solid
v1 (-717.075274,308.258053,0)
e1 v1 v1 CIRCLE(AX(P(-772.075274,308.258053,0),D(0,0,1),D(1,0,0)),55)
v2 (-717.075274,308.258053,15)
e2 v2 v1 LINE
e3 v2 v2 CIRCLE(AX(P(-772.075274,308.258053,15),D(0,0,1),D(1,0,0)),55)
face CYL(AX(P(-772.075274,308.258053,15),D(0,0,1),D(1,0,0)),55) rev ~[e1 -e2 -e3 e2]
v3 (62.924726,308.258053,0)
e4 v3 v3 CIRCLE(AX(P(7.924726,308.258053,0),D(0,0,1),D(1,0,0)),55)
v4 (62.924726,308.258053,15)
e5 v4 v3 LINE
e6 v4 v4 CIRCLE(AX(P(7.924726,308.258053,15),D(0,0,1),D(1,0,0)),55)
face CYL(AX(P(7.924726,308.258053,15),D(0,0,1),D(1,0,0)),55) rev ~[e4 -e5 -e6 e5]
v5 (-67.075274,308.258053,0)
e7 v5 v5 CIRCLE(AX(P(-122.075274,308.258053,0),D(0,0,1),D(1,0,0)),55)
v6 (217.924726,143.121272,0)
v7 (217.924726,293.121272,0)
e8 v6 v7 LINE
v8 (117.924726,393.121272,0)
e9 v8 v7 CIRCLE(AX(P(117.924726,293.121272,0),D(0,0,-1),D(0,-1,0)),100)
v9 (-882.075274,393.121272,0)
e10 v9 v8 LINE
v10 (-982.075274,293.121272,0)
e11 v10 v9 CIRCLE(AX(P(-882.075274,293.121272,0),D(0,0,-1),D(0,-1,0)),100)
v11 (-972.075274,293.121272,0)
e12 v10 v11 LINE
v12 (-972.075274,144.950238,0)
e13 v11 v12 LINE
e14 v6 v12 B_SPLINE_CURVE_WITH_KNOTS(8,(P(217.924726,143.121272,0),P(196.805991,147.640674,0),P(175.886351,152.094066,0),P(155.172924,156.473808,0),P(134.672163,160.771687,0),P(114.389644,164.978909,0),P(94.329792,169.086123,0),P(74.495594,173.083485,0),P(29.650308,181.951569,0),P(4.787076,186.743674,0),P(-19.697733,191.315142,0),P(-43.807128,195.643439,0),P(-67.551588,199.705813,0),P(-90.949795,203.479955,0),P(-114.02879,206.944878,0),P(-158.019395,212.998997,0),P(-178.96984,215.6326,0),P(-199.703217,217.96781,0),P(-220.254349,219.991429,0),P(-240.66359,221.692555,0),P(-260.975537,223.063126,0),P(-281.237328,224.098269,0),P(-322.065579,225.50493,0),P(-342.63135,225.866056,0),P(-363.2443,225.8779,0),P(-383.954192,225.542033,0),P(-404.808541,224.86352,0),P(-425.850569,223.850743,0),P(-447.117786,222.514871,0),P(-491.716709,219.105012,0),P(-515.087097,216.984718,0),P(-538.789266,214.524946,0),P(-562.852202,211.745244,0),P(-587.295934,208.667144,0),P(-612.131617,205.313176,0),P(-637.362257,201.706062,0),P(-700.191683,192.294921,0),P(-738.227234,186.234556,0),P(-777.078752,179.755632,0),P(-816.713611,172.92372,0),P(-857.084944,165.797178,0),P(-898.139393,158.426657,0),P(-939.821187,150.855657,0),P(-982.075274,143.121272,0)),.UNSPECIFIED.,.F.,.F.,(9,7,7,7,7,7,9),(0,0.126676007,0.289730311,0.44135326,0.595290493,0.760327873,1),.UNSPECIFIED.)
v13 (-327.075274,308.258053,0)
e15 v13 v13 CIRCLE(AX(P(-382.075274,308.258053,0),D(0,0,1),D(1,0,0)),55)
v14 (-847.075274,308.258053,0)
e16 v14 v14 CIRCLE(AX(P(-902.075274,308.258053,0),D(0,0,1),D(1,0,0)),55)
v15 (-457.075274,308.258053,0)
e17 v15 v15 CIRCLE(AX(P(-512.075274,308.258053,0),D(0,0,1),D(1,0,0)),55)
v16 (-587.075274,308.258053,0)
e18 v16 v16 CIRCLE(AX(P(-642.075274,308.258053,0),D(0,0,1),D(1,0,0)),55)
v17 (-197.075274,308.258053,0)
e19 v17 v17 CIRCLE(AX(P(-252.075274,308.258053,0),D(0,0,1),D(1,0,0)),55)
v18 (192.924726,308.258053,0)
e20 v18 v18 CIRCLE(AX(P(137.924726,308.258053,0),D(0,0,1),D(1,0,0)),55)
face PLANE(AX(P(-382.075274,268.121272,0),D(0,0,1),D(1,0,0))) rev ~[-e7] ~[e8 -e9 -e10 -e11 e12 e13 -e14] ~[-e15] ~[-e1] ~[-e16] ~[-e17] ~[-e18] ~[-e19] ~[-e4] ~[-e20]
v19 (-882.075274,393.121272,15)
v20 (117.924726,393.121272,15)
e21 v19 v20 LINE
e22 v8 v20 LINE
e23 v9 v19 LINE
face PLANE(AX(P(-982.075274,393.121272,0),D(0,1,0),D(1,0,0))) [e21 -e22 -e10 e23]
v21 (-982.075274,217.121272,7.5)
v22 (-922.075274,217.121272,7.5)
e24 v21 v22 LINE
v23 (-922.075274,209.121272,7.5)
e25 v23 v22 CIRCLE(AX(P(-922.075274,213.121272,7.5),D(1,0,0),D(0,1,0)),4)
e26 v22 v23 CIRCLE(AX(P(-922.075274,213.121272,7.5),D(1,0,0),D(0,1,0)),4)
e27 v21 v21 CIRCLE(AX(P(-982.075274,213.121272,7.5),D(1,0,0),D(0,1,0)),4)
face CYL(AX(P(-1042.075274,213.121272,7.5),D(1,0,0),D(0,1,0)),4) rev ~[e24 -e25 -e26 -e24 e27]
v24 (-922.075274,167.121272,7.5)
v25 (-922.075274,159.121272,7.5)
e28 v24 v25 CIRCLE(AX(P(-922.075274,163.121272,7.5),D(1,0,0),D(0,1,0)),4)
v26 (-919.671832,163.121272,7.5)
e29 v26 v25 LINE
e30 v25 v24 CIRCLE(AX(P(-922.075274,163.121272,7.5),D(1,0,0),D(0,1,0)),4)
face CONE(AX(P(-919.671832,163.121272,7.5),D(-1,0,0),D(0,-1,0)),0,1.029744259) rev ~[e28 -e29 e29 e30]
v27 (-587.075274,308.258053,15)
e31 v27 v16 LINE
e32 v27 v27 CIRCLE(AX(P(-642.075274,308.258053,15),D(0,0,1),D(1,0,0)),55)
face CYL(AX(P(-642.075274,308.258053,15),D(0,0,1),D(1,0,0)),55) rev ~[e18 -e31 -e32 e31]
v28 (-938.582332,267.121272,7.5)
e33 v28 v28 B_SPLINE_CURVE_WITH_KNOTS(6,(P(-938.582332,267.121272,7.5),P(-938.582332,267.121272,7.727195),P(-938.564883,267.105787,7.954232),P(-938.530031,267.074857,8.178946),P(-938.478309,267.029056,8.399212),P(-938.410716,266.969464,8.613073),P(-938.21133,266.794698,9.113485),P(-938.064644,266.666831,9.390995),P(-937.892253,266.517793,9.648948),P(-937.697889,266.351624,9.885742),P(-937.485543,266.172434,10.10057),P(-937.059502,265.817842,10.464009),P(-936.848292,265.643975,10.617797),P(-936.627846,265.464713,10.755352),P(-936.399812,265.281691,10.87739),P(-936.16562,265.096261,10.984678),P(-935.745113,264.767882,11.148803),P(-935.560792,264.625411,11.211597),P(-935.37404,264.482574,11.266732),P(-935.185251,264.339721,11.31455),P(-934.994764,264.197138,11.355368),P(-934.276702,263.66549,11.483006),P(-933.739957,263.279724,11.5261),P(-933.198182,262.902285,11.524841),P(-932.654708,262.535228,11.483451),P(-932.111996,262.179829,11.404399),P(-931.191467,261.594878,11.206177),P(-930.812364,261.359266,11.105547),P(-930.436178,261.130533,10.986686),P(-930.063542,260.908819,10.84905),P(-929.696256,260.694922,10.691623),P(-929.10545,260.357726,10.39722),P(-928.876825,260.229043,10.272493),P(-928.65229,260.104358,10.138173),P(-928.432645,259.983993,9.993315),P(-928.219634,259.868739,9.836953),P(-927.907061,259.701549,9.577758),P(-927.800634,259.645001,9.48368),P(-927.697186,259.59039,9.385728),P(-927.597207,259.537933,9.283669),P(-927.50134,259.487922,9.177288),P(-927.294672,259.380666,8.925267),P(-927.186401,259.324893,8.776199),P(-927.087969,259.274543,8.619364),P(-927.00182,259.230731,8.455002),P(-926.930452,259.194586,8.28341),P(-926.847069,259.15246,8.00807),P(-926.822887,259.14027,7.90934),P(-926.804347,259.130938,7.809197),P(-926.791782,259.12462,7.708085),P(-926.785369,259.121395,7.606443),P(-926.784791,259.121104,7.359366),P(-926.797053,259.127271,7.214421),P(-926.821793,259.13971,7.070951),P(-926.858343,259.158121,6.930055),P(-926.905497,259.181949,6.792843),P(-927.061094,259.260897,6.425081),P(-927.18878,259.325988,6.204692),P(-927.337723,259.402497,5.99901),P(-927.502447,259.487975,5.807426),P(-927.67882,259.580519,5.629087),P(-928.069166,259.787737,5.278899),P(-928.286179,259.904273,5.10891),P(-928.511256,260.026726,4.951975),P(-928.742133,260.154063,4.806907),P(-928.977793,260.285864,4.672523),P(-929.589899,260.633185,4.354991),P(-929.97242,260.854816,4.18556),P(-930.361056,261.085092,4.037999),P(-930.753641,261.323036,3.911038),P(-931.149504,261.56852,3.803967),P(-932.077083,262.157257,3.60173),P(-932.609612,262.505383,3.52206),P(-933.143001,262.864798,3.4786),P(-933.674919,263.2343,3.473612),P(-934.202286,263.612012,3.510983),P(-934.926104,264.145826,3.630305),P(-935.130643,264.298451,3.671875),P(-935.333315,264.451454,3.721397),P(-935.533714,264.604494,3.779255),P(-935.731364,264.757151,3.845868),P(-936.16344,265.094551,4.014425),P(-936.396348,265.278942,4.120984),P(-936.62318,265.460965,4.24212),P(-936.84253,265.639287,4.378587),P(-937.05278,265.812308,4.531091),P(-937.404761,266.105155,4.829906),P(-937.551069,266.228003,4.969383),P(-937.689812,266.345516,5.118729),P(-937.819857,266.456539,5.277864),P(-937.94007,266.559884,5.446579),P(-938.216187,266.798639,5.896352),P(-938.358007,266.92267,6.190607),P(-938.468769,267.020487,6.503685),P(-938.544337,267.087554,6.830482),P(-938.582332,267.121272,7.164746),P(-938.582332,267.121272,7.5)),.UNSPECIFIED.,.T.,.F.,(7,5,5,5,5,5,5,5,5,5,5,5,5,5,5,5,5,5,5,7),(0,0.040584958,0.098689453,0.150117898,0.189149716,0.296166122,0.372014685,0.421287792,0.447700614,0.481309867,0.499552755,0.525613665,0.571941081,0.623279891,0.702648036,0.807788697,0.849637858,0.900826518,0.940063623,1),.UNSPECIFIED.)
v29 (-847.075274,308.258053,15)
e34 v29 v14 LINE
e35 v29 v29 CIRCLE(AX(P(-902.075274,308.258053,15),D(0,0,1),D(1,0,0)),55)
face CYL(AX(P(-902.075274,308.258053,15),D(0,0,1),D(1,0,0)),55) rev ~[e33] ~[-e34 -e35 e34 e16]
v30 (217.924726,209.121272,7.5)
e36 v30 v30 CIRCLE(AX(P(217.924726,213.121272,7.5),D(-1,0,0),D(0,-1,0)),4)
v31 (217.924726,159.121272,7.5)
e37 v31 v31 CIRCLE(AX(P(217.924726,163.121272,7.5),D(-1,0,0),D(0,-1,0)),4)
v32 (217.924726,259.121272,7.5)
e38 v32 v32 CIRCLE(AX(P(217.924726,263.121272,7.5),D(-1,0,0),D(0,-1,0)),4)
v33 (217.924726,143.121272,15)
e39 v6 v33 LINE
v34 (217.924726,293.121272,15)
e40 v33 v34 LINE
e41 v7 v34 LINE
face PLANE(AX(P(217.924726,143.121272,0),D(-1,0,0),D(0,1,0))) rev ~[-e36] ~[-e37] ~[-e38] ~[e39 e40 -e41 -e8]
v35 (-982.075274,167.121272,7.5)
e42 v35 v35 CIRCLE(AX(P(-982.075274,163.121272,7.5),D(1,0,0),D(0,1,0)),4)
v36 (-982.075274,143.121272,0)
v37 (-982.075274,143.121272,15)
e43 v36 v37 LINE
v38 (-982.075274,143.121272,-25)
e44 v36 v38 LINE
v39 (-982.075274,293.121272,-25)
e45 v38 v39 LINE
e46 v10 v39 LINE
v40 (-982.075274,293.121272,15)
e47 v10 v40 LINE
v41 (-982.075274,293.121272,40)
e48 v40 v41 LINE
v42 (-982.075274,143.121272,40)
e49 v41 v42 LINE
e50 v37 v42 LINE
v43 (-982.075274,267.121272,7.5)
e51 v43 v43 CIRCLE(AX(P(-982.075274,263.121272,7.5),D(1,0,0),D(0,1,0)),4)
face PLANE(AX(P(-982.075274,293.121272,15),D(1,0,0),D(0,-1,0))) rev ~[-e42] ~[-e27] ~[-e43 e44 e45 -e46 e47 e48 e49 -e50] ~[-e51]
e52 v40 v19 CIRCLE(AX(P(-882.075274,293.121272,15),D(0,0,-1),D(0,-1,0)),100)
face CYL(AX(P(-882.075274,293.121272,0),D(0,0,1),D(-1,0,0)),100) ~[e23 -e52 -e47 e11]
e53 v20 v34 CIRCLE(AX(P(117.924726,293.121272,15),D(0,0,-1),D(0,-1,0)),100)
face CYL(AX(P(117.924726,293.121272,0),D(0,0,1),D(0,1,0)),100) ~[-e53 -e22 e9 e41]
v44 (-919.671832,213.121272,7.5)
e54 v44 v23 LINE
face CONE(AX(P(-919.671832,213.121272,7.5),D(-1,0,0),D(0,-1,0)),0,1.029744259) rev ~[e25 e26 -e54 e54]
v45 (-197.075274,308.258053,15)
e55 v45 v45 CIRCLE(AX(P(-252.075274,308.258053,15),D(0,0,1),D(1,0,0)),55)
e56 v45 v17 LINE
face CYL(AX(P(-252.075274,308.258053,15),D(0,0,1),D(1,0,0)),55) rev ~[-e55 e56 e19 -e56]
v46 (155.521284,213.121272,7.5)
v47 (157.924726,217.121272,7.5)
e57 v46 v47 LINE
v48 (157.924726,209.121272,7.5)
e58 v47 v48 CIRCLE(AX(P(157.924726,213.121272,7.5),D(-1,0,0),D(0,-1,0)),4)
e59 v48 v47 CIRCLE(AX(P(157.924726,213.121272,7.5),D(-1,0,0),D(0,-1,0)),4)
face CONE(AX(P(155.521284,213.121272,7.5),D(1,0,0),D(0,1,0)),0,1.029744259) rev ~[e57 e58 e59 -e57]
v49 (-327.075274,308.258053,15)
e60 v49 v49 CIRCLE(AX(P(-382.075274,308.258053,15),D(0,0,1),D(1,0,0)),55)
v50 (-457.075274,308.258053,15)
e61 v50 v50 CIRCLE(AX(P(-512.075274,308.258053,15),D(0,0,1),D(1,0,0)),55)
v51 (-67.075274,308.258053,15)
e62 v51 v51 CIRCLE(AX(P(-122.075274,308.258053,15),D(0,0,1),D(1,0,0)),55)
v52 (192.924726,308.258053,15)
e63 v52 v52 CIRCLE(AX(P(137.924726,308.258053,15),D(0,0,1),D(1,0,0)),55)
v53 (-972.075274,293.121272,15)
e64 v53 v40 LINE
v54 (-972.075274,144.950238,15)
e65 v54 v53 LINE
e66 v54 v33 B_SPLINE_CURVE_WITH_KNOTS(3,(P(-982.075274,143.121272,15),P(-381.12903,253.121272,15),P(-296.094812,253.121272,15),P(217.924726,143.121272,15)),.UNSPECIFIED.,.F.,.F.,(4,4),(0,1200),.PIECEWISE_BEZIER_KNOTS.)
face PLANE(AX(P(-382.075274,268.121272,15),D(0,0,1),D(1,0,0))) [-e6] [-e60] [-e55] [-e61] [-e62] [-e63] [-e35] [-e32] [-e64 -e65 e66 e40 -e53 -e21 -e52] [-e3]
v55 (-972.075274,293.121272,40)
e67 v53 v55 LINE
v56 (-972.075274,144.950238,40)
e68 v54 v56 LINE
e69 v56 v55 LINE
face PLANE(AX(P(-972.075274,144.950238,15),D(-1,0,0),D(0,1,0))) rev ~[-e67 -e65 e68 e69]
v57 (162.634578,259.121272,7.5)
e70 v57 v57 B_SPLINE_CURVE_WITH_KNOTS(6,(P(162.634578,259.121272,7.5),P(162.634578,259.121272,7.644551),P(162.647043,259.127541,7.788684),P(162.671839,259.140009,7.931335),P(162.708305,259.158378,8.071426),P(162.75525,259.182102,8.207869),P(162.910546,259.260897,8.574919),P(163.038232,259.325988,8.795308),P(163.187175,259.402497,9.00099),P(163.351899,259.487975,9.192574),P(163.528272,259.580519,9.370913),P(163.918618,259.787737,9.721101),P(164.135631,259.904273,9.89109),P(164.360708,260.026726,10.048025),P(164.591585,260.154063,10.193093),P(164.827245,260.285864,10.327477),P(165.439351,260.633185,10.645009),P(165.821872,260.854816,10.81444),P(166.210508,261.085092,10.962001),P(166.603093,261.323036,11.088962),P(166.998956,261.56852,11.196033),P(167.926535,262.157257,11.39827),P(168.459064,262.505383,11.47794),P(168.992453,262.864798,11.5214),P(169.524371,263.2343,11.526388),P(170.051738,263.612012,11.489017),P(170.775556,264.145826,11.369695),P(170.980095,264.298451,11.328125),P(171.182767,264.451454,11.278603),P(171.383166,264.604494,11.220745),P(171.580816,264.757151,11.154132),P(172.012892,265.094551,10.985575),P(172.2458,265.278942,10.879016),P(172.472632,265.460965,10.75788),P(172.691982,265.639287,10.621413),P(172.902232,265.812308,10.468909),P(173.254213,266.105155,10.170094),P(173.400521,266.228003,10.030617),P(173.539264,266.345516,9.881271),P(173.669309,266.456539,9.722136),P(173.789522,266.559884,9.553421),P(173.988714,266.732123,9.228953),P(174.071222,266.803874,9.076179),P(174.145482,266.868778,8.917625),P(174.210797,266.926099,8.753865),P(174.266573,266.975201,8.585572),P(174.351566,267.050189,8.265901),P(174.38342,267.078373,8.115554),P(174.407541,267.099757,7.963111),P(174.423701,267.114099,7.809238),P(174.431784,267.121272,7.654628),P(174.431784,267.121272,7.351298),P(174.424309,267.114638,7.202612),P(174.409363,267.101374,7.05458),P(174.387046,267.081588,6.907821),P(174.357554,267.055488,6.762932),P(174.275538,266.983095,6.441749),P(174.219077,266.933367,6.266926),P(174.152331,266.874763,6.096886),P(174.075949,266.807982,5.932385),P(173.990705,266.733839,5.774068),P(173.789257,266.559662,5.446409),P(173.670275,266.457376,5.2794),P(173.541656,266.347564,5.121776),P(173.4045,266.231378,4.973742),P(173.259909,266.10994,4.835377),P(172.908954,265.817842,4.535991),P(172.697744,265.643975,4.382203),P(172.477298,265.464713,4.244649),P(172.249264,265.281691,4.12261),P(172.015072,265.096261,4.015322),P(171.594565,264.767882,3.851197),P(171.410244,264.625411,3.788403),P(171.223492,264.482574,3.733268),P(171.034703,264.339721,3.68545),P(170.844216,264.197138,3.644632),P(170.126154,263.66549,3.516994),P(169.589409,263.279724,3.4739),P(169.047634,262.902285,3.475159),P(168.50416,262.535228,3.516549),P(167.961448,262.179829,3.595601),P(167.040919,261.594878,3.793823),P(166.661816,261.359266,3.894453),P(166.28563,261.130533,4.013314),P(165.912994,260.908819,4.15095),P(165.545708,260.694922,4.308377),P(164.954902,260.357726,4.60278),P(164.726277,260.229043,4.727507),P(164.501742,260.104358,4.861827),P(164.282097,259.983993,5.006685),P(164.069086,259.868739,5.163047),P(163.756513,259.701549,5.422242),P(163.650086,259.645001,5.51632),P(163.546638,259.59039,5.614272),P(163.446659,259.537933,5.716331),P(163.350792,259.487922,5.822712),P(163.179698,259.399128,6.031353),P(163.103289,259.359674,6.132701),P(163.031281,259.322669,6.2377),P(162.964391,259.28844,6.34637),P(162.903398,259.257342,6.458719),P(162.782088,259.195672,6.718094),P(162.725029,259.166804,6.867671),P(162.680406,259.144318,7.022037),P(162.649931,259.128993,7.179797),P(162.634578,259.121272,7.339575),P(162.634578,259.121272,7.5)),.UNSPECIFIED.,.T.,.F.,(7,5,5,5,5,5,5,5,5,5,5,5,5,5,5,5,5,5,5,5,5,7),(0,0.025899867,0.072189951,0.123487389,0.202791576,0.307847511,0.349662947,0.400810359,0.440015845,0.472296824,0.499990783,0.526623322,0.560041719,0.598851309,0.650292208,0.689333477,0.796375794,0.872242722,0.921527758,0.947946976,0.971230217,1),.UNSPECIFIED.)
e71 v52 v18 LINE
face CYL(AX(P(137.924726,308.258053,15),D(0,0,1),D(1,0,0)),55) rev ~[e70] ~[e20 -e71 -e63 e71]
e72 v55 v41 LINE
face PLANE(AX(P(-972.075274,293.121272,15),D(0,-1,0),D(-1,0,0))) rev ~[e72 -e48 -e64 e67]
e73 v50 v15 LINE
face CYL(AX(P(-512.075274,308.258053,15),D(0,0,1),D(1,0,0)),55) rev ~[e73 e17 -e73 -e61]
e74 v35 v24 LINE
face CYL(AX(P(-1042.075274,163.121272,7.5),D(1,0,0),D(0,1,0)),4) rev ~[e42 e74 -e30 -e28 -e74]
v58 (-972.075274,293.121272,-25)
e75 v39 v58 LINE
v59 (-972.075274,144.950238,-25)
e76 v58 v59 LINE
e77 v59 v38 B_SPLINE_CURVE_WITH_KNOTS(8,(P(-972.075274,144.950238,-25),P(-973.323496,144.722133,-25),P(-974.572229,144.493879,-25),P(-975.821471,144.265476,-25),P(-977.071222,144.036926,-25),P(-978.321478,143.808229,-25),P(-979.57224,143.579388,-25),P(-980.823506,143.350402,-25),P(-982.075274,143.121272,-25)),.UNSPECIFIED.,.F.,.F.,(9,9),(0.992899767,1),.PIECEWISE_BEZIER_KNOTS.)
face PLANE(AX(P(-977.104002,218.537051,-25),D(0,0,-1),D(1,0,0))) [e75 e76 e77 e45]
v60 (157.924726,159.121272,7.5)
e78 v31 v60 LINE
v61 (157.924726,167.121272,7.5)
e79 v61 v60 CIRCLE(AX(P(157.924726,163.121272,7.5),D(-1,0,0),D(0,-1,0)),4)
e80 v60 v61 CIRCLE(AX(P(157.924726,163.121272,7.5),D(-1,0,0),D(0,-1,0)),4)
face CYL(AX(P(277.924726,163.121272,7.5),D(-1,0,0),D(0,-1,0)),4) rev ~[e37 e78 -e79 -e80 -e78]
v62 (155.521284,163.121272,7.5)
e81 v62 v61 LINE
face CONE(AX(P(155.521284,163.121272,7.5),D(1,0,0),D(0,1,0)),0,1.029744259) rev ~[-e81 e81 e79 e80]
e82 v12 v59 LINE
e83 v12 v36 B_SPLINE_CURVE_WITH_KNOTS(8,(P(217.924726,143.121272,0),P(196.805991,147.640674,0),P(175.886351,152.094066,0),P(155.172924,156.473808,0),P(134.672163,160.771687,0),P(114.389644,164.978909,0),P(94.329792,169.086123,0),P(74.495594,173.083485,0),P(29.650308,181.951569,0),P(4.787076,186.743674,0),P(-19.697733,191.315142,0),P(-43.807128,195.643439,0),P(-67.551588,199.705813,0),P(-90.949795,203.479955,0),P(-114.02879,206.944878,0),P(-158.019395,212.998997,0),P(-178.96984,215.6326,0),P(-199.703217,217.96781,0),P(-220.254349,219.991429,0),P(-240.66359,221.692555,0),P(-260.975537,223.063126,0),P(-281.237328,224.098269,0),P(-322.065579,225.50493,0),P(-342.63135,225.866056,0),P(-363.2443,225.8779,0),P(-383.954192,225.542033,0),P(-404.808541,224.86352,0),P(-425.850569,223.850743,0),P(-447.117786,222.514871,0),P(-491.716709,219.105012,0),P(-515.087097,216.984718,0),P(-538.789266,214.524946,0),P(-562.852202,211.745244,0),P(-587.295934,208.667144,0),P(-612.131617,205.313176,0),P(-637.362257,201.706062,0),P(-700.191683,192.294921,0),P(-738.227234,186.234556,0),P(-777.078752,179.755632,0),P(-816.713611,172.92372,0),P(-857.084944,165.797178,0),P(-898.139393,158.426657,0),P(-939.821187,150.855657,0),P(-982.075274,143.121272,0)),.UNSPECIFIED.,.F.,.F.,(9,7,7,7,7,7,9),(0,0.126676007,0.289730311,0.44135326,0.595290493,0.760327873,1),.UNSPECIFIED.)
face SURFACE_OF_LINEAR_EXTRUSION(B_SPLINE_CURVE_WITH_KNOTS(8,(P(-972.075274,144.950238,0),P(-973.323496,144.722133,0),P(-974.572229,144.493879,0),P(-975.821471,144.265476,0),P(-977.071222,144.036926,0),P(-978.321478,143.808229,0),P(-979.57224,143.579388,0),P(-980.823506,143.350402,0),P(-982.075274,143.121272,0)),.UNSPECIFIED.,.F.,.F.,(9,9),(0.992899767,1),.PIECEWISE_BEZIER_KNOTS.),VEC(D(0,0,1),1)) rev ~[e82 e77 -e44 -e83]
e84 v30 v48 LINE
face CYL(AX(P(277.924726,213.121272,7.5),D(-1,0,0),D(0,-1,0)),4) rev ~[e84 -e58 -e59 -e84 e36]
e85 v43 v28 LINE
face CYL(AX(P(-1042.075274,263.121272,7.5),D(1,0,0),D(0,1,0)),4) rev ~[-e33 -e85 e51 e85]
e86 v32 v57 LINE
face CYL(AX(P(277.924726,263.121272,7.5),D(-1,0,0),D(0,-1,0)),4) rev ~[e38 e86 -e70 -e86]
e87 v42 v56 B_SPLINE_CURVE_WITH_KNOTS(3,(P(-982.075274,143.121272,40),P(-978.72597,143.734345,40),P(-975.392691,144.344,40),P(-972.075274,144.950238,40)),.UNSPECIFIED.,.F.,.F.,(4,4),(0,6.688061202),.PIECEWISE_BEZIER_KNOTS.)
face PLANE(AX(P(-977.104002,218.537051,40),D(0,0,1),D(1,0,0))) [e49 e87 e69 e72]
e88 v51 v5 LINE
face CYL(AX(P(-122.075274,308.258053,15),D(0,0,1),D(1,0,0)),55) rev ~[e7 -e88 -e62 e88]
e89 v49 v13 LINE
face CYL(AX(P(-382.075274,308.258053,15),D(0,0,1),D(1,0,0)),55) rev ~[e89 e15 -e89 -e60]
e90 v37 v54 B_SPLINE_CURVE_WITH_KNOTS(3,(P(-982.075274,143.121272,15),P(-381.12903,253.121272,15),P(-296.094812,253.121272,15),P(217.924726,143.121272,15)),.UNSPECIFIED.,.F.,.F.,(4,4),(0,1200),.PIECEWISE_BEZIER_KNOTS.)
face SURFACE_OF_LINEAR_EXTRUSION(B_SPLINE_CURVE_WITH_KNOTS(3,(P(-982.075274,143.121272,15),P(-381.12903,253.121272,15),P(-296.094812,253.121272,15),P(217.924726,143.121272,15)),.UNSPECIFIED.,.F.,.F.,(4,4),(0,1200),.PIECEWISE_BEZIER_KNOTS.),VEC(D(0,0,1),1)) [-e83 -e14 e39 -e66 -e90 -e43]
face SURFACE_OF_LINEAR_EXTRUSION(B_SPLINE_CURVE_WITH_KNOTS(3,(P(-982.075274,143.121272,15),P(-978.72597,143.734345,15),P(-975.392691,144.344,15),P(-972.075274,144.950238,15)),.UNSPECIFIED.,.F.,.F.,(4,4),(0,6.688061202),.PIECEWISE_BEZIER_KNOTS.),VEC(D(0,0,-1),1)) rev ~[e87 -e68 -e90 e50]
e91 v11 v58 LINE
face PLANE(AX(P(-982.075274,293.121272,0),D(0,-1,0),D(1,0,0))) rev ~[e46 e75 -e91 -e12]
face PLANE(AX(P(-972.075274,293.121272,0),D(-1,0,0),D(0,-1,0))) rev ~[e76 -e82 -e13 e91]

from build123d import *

# Parameters (mm, degrees)
F0_W      = 1200
F0_H      = 250
F1_DEPTH  = 15
F3_DEPTH  = 25
F4_R      = 100
F6_D      = 8
F6_DEPTH  = 60
F6_TIP    = 2.4034424761
F8_D      = 8
F8_DEPTH  = 60
F8_TIP    = 2.4034424761
F9_R      = 55
F10_DEPTH = 25
F12_DEPTH = 25
F14_DEPTH = 25


# Not quite as in the source:
# - a feature names something its author has since deleted; it is built from what else it names


with BuildPart() as f1:
    # F0 (on Top) → F1 (new body)
    with BuildSketch(Plane.XY):
        with Locations((-382.0752739906, 268.1212723255)):
            Rectangle(F0_W, F0_H)
    extrude(amount=F1_DEPTH)

    # F2 (on face) → F3 (cut)
    with BuildSketch(Plane.XY.offset(15)):
        with BuildLine():
            add(Edge.make_bspline(
                [(-982.0752739906, 143.1212723255), (-381.1290302773, 253.1212723255), (-296.0948119124, 253.1212723255), (217.9247260094, 143.1212723255)],
                knots=[0, 0, 0, 0, 1200, 1200, 1200, 1200], degree=3))
            Line((-982.0752739906, 143.1212723255), (217.9247260094, 143.1212723255))
        make_face()
    extrude(amount=-F3_DEPTH, mode=Mode.SUBTRACT)

    # F4
    f4_edges = [f1.edges().sort_by_distance(p)[0] for p in [
        (-982.075274, 393.121272, 7.5),
        (217.924726, 393.121272, 7.5),
    ]]
    fillet(f4_edges, radius=F4_R)

    # F6
    with Locations(Plane(origin=(-982.0752739906, 0, 0), x_dir=(0, -1, 0), z_dir=(-1, 0, 0))):
        with Locations((-163.1212723255, 7.5), (-213.1212723255, 7.5), (-263.1212723255, 7.5)):
            Hole(F6_D / 2, depth=F6_DEPTH)
            with Locations((0, 0, -(F6_DEPTH + F6_TIP / 2))):  # 118° drill point
                Cone(0, F6_D / 2, F6_TIP, mode=Mode.SUBTRACT)

    # F8
    with Locations(Plane.YZ.offset(217.9247260094)):
        with Locations((163.1212723255, 7.5), (213.1212723255, 7.5), (263.1212723255, 7.5)):
            Hole(F8_D / 2, depth=F8_DEPTH)
            with Locations((0, 0, -(F8_DEPTH + F8_TIP / 2))):  # 118° drill point
                Cone(0, F8_D / 2, F8_TIP, mode=Mode.SUBTRACT)

    # F9 (on face) → F10 (cut)
    with BuildSketch(Plane.XY.offset(15)):
        with Locations((-902.0752739906, 308.2580530366)):
            Circle(F9_R)
        with Locations((-772.0752739906, 308.2580530366)):
            Circle(F9_R)
        with Locations((-642.0752739906, 308.2580530366)):
            Circle(F9_R)
        with Locations((-512.0752739906, 308.2580530366)):
            Circle(F9_R)
        with Locations((-382.0752739906, 308.2580530366)):
            Circle(F9_R)
        with Locations((-252.0752739906, 308.2580530366)):
            Circle(F9_R)
        with Locations((-122.0752739906, 308.2580530366)):
            Circle(F9_R)
        with Locations((7.9247260094, 308.2580530366)):
            Circle(F9_R)
        with Locations((137.9247260094, 308.2580530366)):
            Circle(F9_R)
    extrude(amount=-F10_DEPTH, mode=Mode.SUBTRACT)

    # F11 (on face) → F12 (join)
    with BuildSketch(Plane(origin=(0, 0, 0), x_dir=(1, 0, 0), z_dir=(0, 0, -1))):
        with BuildLine():
            add(Edge.make_bspline(
                [(-972.0752739906, -144.9502384932), (-973.3234960268, -144.7221332236), (-974.5722289185, -144.4938787017), (-975.8214712324, -144.265475917), (-977.0712215354, -144.0369258537), (-978.3214783948, -143.8082294911), (-979.5722403783, -143.5793878034), (-980.823506054, -143.3504017601), (-982.0752739906, -143.1212723255)],
                knots=[0.9928997665, 0.9928997665, 0.9928997665, 0.9928997665, 0.9928997665, 0.9928997665, 0.9928997665, 0.9928997665, 0.9928997665, 1, 1, 1, 1, 1, 1, 1, 1, 1], degree=8))
            Line((-982.0752739906, -143.1212723255), (-982.0752739906, -293.1212723255))
            Line((-982.0752739906, -293.1212723255), (-972.0752739906, -293.1212723255))
            Line((-972.0752739906, -293.1212723255), (-972.0752739906, -144.9502384932))
        make_face()
    extrude(amount=F12_DEPTH)

    # F13 (on face) → F14 (join)
    with BuildSketch(Plane.XY.offset(15)):
        with BuildLine():
            Line((-982.0752739906, 293.1212723255), (-982.0752739906, 143.1212723255))
            add(Edge.make_bspline(
                [(-982.0752739906, 143.1212723255), (-978.7259696098, 143.7343446023), (-975.3926908046, 144.3439999918), (-972.0752739906, 144.9502384937)],
                knots=[0, 0, 0, 0, 6.6880612018, 6.6880612018, 6.6880612018, 6.6880612018], degree=3))
            Line((-972.0752739906, 144.9502384937), (-972.0752739906, 293.1212723255))
            Line((-972.0752739906, 293.1212723255), (-982.0752739906, 293.1212723255))
        make_face()
    extrude(amount=F14_DEPTH)


solid = f1.part
